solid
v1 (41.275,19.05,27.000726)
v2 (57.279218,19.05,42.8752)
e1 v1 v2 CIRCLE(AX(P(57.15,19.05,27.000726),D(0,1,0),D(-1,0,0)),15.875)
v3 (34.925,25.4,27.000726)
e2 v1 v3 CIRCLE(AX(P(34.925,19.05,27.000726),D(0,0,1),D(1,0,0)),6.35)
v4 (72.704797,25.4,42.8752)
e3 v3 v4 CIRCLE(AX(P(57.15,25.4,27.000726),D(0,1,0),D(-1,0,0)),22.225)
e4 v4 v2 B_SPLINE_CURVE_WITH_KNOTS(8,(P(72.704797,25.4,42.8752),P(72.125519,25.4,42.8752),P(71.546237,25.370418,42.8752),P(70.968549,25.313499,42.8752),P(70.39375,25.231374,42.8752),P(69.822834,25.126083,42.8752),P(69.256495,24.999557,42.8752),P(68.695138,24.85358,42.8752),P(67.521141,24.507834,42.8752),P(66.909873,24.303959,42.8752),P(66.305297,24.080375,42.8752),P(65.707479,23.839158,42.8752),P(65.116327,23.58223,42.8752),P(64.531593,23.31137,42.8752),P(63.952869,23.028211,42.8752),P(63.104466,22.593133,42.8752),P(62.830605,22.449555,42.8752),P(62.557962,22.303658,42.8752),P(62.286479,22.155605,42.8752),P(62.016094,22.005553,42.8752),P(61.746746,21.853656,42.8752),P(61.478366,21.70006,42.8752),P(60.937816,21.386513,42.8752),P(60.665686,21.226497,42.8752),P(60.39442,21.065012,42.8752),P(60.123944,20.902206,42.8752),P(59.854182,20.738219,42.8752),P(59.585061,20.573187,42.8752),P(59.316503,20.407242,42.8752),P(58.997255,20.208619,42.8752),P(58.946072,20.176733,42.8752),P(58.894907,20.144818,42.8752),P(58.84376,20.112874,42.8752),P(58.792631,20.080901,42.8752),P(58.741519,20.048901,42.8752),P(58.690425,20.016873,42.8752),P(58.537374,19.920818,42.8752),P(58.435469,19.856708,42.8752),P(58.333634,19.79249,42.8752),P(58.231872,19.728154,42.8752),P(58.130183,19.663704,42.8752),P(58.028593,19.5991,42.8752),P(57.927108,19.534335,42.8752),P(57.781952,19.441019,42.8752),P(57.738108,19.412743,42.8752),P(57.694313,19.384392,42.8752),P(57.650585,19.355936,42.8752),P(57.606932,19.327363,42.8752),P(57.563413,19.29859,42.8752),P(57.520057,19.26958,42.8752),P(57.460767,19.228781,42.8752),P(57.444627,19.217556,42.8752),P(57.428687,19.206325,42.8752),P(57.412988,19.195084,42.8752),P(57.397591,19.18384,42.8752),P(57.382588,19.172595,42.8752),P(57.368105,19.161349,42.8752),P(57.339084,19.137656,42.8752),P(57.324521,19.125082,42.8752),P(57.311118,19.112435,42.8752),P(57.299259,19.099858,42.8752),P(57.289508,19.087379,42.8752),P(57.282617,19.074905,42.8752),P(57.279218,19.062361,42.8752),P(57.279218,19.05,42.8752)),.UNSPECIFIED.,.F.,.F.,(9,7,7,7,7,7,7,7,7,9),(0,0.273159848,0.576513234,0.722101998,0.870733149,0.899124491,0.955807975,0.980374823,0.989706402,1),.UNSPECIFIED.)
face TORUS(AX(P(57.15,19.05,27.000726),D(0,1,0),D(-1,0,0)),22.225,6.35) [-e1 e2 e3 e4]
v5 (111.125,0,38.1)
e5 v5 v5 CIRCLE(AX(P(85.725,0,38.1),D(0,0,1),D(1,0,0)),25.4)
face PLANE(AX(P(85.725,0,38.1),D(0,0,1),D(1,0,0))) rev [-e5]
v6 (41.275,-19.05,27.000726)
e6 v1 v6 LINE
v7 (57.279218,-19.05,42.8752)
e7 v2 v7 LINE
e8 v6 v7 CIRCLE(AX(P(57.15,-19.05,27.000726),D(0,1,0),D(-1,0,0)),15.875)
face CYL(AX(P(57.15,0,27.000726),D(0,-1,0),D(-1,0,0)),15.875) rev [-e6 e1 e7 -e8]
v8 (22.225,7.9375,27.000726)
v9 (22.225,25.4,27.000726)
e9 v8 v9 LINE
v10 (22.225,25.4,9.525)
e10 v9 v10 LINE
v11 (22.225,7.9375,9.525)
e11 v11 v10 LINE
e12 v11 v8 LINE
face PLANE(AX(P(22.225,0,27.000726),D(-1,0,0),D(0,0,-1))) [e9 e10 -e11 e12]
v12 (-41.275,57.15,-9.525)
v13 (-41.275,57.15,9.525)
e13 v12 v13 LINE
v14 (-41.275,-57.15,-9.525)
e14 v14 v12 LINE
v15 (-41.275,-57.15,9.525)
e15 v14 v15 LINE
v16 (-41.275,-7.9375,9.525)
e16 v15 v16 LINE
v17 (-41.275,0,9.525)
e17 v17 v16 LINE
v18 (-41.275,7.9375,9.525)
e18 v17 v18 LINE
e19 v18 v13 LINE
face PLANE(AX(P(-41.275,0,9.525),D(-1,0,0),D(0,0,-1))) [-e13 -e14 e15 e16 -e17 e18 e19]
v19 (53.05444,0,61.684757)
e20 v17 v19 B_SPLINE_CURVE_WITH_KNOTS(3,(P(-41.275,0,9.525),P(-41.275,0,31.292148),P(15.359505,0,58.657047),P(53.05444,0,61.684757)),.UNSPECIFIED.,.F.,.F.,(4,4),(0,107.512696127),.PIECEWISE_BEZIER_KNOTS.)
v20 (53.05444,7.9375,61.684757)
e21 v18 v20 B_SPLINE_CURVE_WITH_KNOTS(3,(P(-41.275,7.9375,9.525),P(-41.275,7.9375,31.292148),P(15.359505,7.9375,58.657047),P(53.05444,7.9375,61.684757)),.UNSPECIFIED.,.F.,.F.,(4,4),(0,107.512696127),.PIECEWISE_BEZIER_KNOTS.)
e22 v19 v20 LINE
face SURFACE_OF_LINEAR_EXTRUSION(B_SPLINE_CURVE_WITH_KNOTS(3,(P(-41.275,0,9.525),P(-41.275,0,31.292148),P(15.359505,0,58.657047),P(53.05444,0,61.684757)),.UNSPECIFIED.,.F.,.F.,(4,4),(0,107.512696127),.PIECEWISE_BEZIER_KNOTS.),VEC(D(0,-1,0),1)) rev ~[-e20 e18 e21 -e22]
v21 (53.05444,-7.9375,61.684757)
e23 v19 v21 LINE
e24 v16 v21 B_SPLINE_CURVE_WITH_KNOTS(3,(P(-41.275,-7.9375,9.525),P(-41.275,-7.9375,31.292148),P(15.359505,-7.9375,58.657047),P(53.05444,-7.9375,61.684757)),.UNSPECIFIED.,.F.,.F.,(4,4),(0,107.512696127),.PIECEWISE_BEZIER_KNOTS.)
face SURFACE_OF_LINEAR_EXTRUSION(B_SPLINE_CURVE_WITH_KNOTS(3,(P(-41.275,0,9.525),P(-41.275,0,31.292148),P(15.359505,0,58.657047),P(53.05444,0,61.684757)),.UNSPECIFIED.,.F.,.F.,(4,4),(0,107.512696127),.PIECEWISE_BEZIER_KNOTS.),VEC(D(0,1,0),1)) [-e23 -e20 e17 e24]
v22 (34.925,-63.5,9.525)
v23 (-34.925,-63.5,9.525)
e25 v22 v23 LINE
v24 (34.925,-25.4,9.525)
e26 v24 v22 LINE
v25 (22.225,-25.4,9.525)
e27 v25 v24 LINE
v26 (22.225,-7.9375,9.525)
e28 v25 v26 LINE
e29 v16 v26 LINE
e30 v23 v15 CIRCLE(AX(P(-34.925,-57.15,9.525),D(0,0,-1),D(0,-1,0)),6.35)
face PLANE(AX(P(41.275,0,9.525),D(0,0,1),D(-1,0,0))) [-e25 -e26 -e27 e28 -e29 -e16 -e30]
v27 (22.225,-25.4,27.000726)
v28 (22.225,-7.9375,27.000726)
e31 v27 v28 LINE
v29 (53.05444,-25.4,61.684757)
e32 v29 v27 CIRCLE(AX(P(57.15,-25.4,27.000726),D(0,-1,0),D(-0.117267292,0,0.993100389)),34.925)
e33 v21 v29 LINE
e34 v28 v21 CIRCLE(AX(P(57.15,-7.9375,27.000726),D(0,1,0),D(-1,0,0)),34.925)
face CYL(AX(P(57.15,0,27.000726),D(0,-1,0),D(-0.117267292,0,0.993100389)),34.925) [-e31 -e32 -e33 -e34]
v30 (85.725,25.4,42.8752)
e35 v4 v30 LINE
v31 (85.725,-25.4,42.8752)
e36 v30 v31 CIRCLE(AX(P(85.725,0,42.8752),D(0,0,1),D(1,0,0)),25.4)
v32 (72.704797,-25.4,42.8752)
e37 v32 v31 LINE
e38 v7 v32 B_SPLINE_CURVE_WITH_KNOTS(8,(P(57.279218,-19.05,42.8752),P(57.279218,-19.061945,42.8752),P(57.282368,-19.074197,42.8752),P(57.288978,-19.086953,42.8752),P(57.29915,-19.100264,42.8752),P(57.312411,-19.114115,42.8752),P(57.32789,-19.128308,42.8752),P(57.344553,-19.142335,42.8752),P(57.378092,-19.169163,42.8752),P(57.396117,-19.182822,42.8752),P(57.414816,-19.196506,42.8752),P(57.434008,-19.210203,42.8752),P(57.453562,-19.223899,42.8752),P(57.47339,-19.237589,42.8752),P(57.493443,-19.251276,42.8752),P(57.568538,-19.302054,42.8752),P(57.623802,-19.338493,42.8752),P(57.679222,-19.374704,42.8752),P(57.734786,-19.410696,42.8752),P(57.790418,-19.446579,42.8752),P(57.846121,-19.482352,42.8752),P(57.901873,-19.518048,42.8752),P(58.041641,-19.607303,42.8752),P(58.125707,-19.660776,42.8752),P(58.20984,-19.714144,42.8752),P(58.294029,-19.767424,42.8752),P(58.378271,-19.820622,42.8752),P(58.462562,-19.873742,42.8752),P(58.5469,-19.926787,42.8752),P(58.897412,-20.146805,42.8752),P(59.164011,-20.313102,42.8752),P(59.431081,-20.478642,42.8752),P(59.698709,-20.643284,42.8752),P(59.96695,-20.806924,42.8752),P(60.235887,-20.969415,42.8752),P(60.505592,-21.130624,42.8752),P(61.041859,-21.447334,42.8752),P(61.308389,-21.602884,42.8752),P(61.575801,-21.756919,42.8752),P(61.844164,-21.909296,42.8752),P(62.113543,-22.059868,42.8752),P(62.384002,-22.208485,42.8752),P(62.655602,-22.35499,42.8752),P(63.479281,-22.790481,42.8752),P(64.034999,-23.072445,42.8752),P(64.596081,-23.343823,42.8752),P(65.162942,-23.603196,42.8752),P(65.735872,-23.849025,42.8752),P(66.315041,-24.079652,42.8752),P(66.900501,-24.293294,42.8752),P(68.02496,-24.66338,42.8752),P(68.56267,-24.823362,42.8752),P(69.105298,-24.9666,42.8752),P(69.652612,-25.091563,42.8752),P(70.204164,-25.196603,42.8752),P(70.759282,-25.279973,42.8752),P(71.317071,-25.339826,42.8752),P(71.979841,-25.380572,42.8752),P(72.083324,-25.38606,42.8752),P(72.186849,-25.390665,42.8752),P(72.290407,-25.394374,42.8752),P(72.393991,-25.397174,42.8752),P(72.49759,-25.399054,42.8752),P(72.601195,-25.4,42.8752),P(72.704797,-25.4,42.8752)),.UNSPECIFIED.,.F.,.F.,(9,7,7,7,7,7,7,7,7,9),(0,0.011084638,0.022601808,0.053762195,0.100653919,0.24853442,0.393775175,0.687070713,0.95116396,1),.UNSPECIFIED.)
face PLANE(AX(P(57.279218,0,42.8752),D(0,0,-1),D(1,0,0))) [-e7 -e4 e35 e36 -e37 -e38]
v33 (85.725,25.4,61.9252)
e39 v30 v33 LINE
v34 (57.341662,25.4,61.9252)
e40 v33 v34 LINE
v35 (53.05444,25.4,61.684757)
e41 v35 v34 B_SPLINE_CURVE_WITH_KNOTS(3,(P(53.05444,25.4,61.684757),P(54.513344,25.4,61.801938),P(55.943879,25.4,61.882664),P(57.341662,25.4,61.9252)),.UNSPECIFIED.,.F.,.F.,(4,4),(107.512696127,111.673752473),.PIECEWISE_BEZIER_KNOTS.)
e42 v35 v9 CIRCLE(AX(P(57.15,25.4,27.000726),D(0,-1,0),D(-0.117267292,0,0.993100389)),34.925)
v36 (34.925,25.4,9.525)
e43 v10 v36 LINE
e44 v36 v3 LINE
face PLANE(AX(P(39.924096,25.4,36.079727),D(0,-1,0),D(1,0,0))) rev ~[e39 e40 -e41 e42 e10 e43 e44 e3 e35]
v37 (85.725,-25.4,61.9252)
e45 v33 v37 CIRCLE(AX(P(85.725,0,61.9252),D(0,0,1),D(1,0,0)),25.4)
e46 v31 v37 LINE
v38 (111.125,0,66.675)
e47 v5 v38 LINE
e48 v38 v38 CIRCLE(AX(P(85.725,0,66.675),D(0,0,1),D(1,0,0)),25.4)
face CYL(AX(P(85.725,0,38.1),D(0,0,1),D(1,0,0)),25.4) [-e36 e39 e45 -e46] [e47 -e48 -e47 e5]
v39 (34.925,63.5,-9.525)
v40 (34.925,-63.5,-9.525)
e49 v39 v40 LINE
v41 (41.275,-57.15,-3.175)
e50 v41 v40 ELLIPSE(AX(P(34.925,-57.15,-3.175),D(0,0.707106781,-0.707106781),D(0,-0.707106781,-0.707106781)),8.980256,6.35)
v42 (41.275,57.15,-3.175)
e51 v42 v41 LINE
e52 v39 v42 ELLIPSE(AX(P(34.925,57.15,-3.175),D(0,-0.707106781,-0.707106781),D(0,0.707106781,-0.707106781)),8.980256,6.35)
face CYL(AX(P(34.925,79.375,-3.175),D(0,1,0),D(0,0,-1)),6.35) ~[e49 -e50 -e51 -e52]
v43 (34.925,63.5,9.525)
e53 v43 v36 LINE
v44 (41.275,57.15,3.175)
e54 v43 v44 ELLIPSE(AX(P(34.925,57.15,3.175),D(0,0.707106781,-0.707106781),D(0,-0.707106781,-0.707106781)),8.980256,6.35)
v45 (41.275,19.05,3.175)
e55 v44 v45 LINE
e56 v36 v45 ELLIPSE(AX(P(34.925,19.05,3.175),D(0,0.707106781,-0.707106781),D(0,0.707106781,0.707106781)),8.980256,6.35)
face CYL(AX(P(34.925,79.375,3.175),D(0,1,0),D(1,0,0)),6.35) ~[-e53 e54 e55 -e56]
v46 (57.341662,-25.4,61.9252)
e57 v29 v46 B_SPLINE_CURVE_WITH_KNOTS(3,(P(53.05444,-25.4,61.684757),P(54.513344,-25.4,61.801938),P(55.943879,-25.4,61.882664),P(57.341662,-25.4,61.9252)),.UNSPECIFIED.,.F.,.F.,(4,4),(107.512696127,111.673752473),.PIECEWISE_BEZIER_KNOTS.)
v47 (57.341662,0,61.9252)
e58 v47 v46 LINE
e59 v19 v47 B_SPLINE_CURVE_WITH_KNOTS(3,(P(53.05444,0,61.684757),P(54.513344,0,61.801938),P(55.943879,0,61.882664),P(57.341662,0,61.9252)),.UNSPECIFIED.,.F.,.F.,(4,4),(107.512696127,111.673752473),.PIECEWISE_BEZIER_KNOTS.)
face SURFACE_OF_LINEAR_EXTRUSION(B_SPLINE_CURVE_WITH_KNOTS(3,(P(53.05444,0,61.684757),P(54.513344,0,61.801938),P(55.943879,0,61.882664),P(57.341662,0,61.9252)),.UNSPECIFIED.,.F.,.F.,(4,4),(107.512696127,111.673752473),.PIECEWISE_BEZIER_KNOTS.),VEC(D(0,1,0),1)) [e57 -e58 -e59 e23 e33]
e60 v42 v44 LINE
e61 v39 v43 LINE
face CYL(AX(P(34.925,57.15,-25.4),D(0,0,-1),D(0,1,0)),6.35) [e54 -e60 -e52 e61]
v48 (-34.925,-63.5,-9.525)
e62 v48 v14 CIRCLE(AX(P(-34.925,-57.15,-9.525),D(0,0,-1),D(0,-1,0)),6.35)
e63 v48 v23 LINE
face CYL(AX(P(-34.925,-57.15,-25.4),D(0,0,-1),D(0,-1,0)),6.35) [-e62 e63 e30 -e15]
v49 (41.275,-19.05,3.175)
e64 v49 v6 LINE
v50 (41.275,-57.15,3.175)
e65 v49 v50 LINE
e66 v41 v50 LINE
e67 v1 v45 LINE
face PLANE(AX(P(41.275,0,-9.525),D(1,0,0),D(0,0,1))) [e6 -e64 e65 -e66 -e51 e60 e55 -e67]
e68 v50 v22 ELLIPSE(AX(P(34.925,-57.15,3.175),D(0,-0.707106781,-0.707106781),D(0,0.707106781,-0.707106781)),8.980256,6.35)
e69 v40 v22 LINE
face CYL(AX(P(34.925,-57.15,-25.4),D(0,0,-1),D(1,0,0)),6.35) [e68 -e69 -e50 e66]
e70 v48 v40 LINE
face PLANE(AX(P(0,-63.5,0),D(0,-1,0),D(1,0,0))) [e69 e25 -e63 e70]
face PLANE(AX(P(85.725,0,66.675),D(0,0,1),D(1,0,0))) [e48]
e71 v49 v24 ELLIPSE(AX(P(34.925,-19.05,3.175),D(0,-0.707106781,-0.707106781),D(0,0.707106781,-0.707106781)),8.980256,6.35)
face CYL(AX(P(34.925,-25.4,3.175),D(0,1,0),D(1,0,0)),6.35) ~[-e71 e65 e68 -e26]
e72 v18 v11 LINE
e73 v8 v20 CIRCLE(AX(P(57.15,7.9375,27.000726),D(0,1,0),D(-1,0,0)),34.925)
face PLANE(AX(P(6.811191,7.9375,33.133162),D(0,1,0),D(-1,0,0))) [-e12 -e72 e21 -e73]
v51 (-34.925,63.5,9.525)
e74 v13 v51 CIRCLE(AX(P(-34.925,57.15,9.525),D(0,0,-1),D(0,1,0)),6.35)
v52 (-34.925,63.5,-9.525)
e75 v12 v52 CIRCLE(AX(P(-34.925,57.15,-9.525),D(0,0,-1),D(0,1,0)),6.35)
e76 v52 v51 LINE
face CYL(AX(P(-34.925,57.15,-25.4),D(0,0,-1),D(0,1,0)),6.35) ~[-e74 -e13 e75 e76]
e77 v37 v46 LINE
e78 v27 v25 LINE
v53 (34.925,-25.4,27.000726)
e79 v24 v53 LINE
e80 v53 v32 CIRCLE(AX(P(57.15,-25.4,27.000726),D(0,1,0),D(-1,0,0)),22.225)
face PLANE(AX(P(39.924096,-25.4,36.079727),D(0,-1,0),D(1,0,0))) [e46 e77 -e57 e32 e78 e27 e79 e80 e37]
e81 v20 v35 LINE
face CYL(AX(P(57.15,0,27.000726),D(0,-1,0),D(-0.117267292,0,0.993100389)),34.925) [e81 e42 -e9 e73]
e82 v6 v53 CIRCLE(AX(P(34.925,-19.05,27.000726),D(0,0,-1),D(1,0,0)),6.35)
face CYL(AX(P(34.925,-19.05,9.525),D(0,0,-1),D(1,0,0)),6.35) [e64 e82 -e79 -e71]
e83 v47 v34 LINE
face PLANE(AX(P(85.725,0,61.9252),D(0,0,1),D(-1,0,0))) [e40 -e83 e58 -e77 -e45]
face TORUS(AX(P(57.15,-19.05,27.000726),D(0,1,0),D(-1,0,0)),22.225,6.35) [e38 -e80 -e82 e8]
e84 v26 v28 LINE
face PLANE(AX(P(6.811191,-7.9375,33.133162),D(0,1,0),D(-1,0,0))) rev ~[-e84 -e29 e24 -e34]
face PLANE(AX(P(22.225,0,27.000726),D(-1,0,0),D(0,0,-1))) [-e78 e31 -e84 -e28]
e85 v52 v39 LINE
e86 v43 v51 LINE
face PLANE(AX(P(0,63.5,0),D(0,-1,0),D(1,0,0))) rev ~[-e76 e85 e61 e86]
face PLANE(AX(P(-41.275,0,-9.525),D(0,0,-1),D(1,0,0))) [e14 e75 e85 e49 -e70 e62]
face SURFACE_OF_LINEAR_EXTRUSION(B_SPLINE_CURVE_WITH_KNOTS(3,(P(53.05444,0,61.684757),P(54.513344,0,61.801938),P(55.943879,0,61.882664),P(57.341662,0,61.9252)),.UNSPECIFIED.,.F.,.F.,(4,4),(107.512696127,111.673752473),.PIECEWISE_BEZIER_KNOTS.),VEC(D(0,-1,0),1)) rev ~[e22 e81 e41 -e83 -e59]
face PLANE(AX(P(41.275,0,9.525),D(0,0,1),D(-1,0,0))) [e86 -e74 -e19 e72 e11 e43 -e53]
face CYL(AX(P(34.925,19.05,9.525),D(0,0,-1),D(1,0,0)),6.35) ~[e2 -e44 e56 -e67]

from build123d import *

# Parameters (mm, degrees)
F1_DEPTH     = 63.5
F0_W         = 25.4
F0_H         = 19.05
F2_DEPTH     = 25.4
F3_DEPTH     = 7.9375
F5_T1_DEPTH  = 50.8
F5_T3_DEPTH  = 158.75
F5_T5_DEPTH  = 53.975
F5_T7_DEPTH  = 17.4757259071
F5_T9_DEPTH  = 53.975
F5_T12_ANGLE = 147.7854112401
F5_T14_ANGLE = 147.7854112401
F5_T19_DEPTH = 53.975
F5_T23_DEPTH = 33.3507259071
F5_T30_DEPTH = 33.3507259071
F5_T34_DEPTH = 53.975


# Not quite as in the source:
# - a fillet or chamfer that OpenCascade refuses, or shapes differently, is made with other operations: its cross-section is extruded or revolved along the edge and cut away or added


with BuildPart() as f1:
    # F0 (on Front) → F1 (new body, symmetric)
    with BuildSketch(Plane.XZ):
        Polygon((-41.275, -9.525), (41.275, -9.525), (41.275, 9.525), (22.225, 9.525), (-41.275, 9.525), align=None)
    extrude(amount=F1_DEPTH, both=True)

    # F0 (on Front) → F2 (join, symmetric)
    with BuildSketch(Plane.XZ):
        with BuildLine():
            Line((22.225, 9.525), (41.275, 9.525))
            Line((41.275, 9.525), (41.275, 27.0007259071))
            ThreePointArc((41.275, 27.0007259071), (45.9704586348, 38.2716389076), (57.2792179355, 42.8752))
            Line((57.2792179355, 42.8752), (60.325, 42.8752))
            Line((60.325, 42.8752), (60.325, 61.9252))
            Line((60.325, 61.9252), (57.3416620374, 61.9252))
            add(Edge.make_bspline(
                [(53.0544398296, 61.6847569862), (54.513344238, 61.8019382233), (55.9438787453, 61.882664375), (57.3416620374, 61.9252)],
                knots=[107.5126961268, 107.5126961268, 107.5126961268, 107.5126961268, 111.6737524732, 111.6737524732, 111.6737524732, 111.6737524732], degree=3))
            ThreePointArc((53.0544398296, 61.6847569862), (31.0464268351, 50.2032924252), (22.225, 27.0007259071))
            Line((22.225, 27.0007259071), (22.225, 9.525))
        make_face()
        with Locations((73.025, 52.4002)):
            Rectangle(F0_W, F0_H)
    extrude(amount=F2_DEPTH, both=True)

    # F0 (on Front) → F3 (join, symmetric)
    with BuildSketch(Plane.XZ):
        with BuildLine():
            add(Edge.make_bspline(
                [(-41.275, 9.525), (-41.275, 31.2921475952), (15.3595053514, 58.6570472681), (53.0544398296, 61.6847569862)],
                knots=[0, 0, 0, 0, 107.5126961268, 107.5126961268, 107.5126961268, 107.5126961268], degree=3))
            Line((-41.275, 9.525), (22.225, 9.525))
            Line((22.225, 9.525), (22.225, 27.0007259071))
            ThreePointArc((22.225, 27.0007259071), (31.0464268351, 50.2032924252), (53.0544398296, 61.6847569862))
        make_face()
    extrude(amount=F3_DEPTH, both=True)

    # F0 (on Front) → F4 (revolve)
    with BuildSketch(Plane.XZ):
        Polygon((85.725, 61.9252), (85.725, 42.8752), (85.725, 38.1), (111.125, 38.1), (111.125, 66.675), (85.725, 66.675), align=None)
    revolve(axis=Axis((85.725, 0, 52.3875), (0, 0, 1)))

    # F5: fillet of radius 6.35 on 12 edges, made by hand

    # F5_s2 → F5_t1 (cut)
    with BuildSketch(Plane.XY.offset(-25.4)):
        with BuildLine():
            ThreePointArc((41.275, -57.15), (39.4151280605, -61.6401280605), (34.925, -63.5))
            Line((34.925, -63.5), (41.275, -63.5))
            Line((41.275, -63.5), (41.275, -57.15))
        make_face()
        with BuildLine():
            ThreePointArc((-34.925, -63.5), (-39.4151280605, -61.6401280605), (-41.275, -57.15))
            Line((-41.275, -57.15), (-41.275, -63.5))
            Line((-41.275, -63.5), (-34.925, -63.5))
        make_face()
        with BuildLine():
            ThreePointArc((34.925, 63.5), (39.4151280605, 61.6401280605), (41.275, 57.15))
            Line((41.275, 57.15), (41.275, 63.5))
            Line((41.275, 63.5), (34.925, 63.5))
        make_face()
        with BuildLine():
            ThreePointArc((-34.925, 63.5), (-39.4151280605, 61.6401280605), (-41.275, 57.15))
            Line((-41.275, 57.15), (-41.275, 63.5))
            Line((-41.275, 63.5), (-34.925, 63.5))
        make_face()
    extrude(amount=F5_T1_DEPTH, mode=Mode.SUBTRACT)

    # F5_s4 → F5_t3 (cut)
    with BuildSketch(Plane.XZ.offset(-79.375)):
        with BuildLine():
            ThreePointArc((34.925, -9.525), (39.4151280605, -7.6651280605), (41.275, -3.175))
            Line((41.275, -3.175), (41.275, -9.525))
            Line((41.275, -9.525), (34.925, -9.525))
        make_face()
    extrude(amount=F5_T3_DEPTH, mode=Mode.SUBTRACT)

    # F5_s6 → F5_t5 (cut)
    with BuildSketch(Plane.XZ.offset(-79.375)):
        with BuildLine():
            ThreePointArc((41.275, 3.175), (39.4151280605, 7.6651280605), (34.925, 9.525))
            Line((34.925, 9.525), (41.275, 9.525))
            Line((41.275, 9.525), (41.275, 3.175))
        make_face()
    extrude(amount=F5_T5_DEPTH, mode=Mode.SUBTRACT)

    # F5_s8 → F5_t7 (cut)
    with BuildSketch(Plane.XY.offset(9.525)):
        with BuildLine():
            ThreePointArc((41.275, 19.05), (39.4151280605, 23.5401280605), (34.925, 25.4))
            Line((34.925, 25.4), (41.275, 25.4))
            Line((41.275, 25.4), (41.275, 19.05))
        make_face()
        with BuildLine():
            ThreePointArc((41.275, -19.05), (39.4151280605, -23.5401280605), (34.925, -25.4))
            Line((34.925, -25.4), (41.275, -25.4))
            Line((41.275, -25.4), (41.275, -19.05))
        make_face()
    extrude(amount=F5_T7_DEPTH, mode=Mode.SUBTRACT)

    # F5_s10 → F5_t9 (cut)
    with BuildSketch(Plane.XZ.offset(25.4)):
        with BuildLine():
            ThreePointArc((41.275, 3.175), (39.4151280605, 7.6651280605), (34.925, 9.525))
            Line((34.925, 9.525), (41.275, 9.525))
            Line((41.275, 9.525), (41.275, 3.175))
        make_face()
    extrude(amount=F5_T9_DEPTH, mode=Mode.SUBTRACT)

    # F5_s11 → F5_t12 (revolve, cut)
    with BuildSketch(Plane.XY.offset(27.0007259071)):
        with BuildLine():
            ThreePointArc((34.925, 25.4), (39.4151280605, 23.5401280605), (41.275, 19.05))
            Line((41.275, 19.05), (41.275, 25.4))
            Line((41.275, 25.4), (34.925, 25.4))
        make_face()
    revolve(axis=Axis((57.15, 25.4, 27.0007259071), (0, 1, 0)), revolution_arc=F5_T12_ANGLE, mode=Mode.SUBTRACT)

    # F5_s13 → F5_t14 (revolve, cut)
    with BuildSketch(Plane.XY.offset(27.0007259071)):
        with BuildLine():
            ThreePointArc((41.275, -19.05), (39.4151280605, -23.5401280605), (34.925, -25.4))
            Line((34.925, -25.4), (41.275, -25.4))
            Line((41.275, -25.4), (41.275, -19.05))
        make_face()
    revolve(axis=Axis((57.15, -25.4, 27.0007259071), (0, 1, 0)), revolution_arc=F5_T14_ANGLE, mode=Mode.SUBTRACT)


with BuildPart() as f5_tool17:
    # F5_s18 → F5_t19 (new body)
    with BuildSketch(Plane.XZ.offset(-63.5)):
        with BuildLine():
            ThreePointArc((41.275, 3.175), (39.4151280605, 7.6651280605), (34.925, 9.525))
            Line((34.925, 9.525), (41.275, 9.525))
            Line((41.275, 9.525), (41.275, 3.175))
        make_face()
    extrude(amount=F5_T19_DEPTH)

    split(bisect_by=Plane.XZ.offset(-25.4), keep=Keep.TOP)


with BuildPart() as f5_tool21:
    # F5_s22 → F5_t23 (new body)
    with BuildSketch(Plane.XY.offset(-6.35)):
        with BuildLine():
            ThreePointArc((41.275, 19.05), (39.4151280605, 23.5401280605), (34.925, 25.4))
            Line((34.925, 25.4), (41.275, 25.4))
            Line((41.275, 25.4), (41.275, 19.05))
        make_face()
    extrude(amount=F5_T23_DEPTH)

    split(bisect_by=Plane.XY.offset(9.525), keep=Keep.BOTTOM)


with BuildPart() as f5_tool17_1:
    add(f5_tool17.part)

    # F5_t25: intersect F5_tool21
    add(f5_tool21.part, mode=Mode.INTERSECT)


with BuildPart() as f1_1:
    add(f1.part)

    # F5_t15: cut F5_tool17
    add(f5_tool17_1.part, mode=Mode.SUBTRACT)


with BuildPart() as f5_tool28:
    # F5_s29 → F5_t30 (new body)
    with BuildSketch(Plane.XY.offset(-6.35)):
        with BuildLine():
            ThreePointArc((41.275, -19.05), (39.4151280605, -23.5401280605), (34.925, -25.4))
            Line((34.925, -25.4), (41.275, -25.4))
            Line((41.275, -25.4), (41.275, -19.05))
        make_face()
    extrude(amount=F5_T30_DEPTH)

    split(bisect_by=Plane.XY.offset(9.525), keep=Keep.BOTTOM)


with BuildPart() as f5_tool32:
    # F5_s33 → F5_t34 (new body)
    with BuildSketch(Plane.XZ.offset(9.525)):
        with BuildLine():
            ThreePointArc((41.275, 3.175), (39.4151280605, 7.6651280605), (34.925, 9.525))
            Line((34.925, 9.525), (41.275, 9.525))
            Line((41.275, 9.525), (41.275, 3.175))
        make_face()
    extrude(amount=F5_T34_DEPTH)

    split(bisect_by=Plane.XZ.offset(25.4), keep=Keep.BOTTOM)


with BuildPart() as f5_tool28_1:
    add(f5_tool28.part)

    # F5_t36: intersect F5_tool32
    add(f5_tool32.part, mode=Mode.INTERSECT)


with BuildPart() as f1_2:
    add(f1_1.part)

    # F5_t26: cut F5_tool28
    add(f5_tool28_1.part, mode=Mode.SUBTRACT)


solid = f1_2.part
